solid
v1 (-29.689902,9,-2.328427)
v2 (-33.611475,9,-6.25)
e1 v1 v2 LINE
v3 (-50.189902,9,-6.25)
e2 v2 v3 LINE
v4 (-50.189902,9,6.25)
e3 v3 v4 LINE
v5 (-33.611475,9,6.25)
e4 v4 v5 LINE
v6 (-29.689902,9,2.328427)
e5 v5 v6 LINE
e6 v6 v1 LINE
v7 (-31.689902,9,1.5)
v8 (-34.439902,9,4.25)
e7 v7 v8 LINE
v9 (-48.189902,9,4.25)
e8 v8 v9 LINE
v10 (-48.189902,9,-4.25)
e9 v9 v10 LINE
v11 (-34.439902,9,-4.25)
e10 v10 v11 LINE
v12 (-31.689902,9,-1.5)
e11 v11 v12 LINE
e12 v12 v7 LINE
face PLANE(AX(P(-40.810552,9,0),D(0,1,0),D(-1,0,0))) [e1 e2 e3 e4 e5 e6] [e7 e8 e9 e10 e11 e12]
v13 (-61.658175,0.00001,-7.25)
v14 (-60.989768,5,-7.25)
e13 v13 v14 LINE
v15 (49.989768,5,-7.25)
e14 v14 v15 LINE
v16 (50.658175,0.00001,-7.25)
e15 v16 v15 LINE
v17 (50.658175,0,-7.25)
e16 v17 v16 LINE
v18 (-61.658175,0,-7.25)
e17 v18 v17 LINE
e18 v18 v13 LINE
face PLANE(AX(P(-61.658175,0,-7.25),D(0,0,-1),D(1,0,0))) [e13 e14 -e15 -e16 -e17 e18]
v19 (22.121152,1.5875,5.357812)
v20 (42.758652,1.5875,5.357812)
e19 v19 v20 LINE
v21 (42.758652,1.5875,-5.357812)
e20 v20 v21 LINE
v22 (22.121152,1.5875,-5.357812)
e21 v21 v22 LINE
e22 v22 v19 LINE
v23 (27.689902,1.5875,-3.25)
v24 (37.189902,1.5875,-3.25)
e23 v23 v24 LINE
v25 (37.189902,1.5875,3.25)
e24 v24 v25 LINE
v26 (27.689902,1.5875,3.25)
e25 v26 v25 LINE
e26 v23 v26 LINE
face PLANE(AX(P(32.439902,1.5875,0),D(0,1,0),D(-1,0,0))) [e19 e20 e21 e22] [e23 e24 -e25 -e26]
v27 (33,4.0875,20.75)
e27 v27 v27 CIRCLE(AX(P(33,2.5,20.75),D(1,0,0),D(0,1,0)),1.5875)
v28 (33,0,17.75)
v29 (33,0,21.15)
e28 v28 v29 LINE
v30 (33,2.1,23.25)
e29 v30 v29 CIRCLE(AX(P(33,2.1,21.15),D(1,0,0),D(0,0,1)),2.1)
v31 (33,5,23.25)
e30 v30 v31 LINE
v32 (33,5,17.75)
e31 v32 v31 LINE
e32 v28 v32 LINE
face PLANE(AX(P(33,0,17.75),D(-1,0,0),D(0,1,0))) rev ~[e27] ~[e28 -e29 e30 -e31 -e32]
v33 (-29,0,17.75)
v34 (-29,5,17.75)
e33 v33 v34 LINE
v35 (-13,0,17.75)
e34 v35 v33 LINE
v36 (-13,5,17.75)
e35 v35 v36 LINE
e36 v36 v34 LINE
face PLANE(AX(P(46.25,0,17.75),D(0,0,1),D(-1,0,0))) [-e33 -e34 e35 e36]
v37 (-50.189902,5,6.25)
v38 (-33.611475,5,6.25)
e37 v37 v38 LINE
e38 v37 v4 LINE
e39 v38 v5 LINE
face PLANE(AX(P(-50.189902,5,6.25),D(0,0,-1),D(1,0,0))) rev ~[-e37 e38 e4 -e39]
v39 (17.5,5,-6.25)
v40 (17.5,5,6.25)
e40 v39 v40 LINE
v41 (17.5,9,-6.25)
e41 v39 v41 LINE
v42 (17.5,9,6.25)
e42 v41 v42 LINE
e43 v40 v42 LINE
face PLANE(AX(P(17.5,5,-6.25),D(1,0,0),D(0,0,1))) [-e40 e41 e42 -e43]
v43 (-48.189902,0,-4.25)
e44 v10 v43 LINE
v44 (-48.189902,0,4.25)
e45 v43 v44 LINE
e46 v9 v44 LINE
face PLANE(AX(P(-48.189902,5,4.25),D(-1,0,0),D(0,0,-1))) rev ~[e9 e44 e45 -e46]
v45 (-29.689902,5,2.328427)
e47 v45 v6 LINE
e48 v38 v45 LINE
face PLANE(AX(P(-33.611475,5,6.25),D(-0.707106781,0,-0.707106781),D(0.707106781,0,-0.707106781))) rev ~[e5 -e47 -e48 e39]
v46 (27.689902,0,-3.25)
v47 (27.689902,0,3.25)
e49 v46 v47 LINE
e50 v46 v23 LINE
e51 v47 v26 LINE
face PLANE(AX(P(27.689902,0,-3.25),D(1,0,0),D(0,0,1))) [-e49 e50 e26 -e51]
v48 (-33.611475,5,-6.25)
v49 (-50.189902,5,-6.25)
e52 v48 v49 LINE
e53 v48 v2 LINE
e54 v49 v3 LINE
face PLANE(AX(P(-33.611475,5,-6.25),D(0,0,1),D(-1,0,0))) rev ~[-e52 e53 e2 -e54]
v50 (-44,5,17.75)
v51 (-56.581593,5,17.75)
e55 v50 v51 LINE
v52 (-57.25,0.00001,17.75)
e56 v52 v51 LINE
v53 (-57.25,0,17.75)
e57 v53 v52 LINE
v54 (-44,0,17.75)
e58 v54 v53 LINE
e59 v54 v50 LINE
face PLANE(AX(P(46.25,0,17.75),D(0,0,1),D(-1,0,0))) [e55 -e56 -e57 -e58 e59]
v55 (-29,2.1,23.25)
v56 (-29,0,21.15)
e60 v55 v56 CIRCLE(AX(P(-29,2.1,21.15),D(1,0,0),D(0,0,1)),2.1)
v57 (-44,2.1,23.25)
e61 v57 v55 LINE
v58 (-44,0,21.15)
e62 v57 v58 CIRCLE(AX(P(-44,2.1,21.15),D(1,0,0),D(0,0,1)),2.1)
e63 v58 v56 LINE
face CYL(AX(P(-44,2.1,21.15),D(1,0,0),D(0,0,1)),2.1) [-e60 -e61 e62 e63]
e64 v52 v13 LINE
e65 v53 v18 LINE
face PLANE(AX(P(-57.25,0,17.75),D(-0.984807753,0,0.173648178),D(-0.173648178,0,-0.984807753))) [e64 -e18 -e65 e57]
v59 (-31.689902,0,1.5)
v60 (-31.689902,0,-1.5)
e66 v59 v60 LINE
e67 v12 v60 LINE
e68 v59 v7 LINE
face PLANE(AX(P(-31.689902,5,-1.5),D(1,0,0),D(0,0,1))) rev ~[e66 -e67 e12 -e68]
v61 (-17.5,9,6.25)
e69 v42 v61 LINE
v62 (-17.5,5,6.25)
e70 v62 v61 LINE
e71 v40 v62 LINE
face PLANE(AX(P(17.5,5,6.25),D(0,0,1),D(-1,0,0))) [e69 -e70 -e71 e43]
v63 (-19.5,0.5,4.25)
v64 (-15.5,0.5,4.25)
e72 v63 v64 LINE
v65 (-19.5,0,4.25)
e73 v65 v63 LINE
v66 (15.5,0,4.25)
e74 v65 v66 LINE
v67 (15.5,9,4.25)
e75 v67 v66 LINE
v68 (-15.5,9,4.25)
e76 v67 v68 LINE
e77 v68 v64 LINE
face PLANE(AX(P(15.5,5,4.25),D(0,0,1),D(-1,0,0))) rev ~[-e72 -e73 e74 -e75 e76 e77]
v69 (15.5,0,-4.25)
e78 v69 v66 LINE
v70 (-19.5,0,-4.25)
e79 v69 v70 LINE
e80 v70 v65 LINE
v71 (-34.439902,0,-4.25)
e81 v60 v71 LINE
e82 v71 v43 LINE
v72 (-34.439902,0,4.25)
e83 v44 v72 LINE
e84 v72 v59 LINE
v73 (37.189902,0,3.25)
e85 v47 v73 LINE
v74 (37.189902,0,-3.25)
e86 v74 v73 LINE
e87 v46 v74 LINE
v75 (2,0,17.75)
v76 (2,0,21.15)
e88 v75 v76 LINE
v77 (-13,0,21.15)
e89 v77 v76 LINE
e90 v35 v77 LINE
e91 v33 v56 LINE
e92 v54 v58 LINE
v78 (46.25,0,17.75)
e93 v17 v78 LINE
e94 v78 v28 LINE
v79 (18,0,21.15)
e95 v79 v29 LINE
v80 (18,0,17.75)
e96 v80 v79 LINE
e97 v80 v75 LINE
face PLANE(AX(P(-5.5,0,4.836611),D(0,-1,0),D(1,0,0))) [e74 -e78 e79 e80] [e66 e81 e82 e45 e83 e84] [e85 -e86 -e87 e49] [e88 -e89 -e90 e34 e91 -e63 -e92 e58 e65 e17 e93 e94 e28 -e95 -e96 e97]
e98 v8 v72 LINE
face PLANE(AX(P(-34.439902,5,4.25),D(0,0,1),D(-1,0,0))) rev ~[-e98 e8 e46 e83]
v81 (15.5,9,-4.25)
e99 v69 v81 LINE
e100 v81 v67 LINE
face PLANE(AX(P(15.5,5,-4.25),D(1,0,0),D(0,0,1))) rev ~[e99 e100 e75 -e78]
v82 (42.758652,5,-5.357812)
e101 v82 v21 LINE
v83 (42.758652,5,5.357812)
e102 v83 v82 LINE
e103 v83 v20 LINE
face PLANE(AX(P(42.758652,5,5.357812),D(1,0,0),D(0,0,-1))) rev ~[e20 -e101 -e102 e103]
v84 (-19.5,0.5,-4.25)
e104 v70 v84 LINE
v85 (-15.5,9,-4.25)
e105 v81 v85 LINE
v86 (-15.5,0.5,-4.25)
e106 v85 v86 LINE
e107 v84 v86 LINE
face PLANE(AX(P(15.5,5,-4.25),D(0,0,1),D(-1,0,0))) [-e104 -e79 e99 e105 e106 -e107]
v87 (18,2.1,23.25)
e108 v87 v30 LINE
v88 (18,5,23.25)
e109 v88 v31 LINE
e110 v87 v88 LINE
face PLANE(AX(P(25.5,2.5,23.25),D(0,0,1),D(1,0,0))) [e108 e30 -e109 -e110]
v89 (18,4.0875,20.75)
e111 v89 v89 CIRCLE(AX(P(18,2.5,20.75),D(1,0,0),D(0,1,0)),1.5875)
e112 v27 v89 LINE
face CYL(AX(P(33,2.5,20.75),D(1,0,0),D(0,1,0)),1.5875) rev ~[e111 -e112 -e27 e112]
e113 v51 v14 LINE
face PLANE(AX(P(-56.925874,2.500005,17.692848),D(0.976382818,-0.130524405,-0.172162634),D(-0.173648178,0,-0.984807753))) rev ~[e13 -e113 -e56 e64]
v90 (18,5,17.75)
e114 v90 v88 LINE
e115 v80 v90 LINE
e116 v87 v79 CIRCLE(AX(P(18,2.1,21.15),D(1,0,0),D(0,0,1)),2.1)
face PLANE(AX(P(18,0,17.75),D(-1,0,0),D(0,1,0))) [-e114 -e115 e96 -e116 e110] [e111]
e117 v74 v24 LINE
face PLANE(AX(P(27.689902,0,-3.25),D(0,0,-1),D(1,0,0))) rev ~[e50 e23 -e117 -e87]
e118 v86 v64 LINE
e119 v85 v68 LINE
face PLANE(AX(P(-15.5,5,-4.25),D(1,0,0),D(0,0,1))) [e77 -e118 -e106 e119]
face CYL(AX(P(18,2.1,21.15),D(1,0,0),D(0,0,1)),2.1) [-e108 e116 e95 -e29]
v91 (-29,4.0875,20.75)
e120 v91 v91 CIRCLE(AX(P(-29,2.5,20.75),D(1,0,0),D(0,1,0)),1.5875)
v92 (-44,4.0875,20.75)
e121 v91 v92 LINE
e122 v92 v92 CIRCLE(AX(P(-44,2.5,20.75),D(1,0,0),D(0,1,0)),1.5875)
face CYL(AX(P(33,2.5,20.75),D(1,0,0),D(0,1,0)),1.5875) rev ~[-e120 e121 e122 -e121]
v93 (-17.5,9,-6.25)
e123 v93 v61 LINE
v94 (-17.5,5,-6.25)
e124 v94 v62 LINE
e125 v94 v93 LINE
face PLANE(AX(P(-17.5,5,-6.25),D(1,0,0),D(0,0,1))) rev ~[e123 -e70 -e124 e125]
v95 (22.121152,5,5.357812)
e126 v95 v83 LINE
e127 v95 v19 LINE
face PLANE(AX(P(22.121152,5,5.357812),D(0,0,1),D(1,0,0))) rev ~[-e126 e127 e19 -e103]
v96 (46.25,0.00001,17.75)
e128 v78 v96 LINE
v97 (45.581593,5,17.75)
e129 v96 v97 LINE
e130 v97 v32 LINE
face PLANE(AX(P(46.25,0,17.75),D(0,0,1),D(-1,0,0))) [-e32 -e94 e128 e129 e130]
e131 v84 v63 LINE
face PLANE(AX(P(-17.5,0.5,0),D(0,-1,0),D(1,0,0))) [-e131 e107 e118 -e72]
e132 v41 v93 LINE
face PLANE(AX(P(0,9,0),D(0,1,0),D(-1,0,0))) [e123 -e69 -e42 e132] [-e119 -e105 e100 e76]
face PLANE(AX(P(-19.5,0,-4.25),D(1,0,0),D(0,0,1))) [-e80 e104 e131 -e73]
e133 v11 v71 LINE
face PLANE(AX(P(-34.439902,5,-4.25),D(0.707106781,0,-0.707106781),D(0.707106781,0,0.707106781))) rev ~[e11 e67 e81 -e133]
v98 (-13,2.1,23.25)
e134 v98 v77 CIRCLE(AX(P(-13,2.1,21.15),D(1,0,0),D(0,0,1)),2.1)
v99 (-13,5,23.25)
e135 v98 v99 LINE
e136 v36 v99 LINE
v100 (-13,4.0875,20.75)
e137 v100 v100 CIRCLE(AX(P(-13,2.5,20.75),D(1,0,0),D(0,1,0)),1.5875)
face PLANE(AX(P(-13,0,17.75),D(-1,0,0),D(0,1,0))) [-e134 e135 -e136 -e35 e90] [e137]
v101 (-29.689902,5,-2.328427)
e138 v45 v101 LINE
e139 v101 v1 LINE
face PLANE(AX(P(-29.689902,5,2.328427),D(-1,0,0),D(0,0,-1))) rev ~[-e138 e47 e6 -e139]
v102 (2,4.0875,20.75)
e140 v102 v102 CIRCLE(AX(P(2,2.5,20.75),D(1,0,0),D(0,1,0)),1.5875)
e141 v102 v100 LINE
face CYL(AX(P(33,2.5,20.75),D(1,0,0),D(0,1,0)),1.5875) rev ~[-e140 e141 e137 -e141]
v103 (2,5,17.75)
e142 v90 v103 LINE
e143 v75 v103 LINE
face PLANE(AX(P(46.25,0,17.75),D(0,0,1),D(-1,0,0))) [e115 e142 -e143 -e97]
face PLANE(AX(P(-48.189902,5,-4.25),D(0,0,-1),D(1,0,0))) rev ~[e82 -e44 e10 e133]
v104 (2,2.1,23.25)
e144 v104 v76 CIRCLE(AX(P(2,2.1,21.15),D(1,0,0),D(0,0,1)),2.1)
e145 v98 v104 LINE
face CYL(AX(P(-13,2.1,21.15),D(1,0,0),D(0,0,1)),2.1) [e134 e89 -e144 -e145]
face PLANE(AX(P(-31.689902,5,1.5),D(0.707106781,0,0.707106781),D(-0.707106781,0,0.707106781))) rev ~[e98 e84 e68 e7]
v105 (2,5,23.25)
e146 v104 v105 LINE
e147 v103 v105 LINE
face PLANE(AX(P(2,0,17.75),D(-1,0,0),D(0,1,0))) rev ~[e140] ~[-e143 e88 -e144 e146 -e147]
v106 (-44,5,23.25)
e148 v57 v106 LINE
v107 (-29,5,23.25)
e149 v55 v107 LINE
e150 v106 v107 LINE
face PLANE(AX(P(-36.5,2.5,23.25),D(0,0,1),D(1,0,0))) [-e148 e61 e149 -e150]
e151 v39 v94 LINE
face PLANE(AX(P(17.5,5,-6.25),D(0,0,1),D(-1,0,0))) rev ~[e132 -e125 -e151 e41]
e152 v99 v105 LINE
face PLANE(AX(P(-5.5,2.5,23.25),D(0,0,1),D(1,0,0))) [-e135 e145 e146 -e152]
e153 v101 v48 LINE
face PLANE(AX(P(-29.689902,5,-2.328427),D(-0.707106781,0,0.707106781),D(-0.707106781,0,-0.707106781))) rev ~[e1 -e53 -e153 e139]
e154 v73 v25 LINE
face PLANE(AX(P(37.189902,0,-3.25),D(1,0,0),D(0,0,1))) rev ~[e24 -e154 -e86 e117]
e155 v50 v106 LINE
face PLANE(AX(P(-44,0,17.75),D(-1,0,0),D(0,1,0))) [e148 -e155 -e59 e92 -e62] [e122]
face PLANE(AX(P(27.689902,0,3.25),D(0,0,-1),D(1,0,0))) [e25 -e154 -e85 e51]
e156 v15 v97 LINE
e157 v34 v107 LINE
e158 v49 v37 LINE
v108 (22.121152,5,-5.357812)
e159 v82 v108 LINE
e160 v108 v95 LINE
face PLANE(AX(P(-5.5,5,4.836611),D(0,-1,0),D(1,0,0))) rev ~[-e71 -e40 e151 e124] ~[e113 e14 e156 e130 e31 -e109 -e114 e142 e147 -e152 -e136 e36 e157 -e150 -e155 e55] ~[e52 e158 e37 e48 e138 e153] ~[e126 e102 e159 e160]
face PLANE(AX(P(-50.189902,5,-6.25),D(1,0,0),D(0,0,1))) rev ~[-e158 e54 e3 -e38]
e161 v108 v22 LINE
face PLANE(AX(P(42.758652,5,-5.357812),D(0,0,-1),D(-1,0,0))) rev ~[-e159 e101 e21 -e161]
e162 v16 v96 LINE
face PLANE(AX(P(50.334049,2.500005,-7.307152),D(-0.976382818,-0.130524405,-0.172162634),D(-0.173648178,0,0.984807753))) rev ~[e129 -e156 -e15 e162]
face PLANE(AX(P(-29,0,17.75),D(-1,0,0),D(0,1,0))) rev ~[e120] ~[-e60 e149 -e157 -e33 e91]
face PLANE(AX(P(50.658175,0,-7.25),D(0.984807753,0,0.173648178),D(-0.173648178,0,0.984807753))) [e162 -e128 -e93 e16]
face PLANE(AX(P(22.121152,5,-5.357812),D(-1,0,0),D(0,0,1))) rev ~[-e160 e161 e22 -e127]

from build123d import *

# Parameters (mm, degrees)
F0_W       = 31
F0_H       = 8.5
F0_W_2     = 9.5
F0_H_2     = 6.5
F1_DEPTH   = 5
F2_W       = 4
F2_H       = 8.5
F3_DEPTH   = 0.5
F5_DEPTH   = 3.4125
F7_SIZE2   = 0.658252
F7_SIZE    = 4.99999
F7_2_SIZE2 = 0.658252
F7_2_SIZE  = 4.99999
F8_W       = 35
F8_H       = 12.5
F8_W_2     = 31
F8_H_2     = 8.5
F9_DEPTH   = 4
F11_DEPTH  = 4
F12_W      = 15
F12_H      = 5
F13_DEPTH  = 5.5
F14_R      = 1.5875
F15_DEPTH  = 94.6591745177
F16_R      = 2.1


# Not quite as in the source:
# - a fillet or chamfer is up to 0.001 mm smaller than in the source, because OpenCascade refuses the exact size
# - a length typed as a fraction of an inch, garbled in the dataset ("3 / 203.2 mm" for 3/8 in), is restored


with BuildPart() as f1:
    # F0 (on Front) → F1 (new body)
    with BuildSketch(Plane.XZ):
        Polygon((46.25, 17.75), (-57.25, 17.75), (-61.6581745177, -7.25), (50.6581745177, -7.25), align=None)
        Polygon((-48.1899019538, 4.25), (-34.4399019538, 4.25), (-31.6899019538, 1.5), (-31.6899019538, -1.5), (-34.4399019538, -4.25), (-48.1899019538, -4.25), align=None, mode=Mode.SUBTRACT)
        Rectangle(F0_W, F0_H, mode=Mode.SUBTRACT)
        with Locations((32.4399019538, 0)):
            Rectangle(F0_W_2, F0_H_2, mode=Mode.SUBTRACT)
    extrude(amount=-F1_DEPTH)

    # F2 (on face) → F3 (cut)
    with BuildSketch(Plane.XZ):
        with Locations((-17.5, 0)):
            Rectangle(F2_W, F2_H)
    extrude(amount=-F3_DEPTH, mode=Mode.SUBTRACT)

    # F4 (on face) → F5 (cut)
    with BuildSketch(Plane(origin=(0, 5, 0), x_dir=(-1, 0, 0), z_dir=(0, 1, 0))):
        Polygon((-22.1211519538, -5.3578125), (-22.1211519538, 5.3578125), (-42.7586519538, 5.3578125), (-42.7586519538, -5.3578125), align=None)
    extrude(amount=-F5_DEPTH, mode=Mode.SUBTRACT)

    # F7 (size 5 and 0.6582624879 in the source; OpenCascade refuses exactly that, so slightly less here)
    f7_edges = [f1.edges().sort_by_distance(p)[0] for p in [
        (-59.454087, 5, 5.25),
    ]]
    f7_side = f1.faces().sort_by_distance((-59.454087, 2.5, 5.25))[0]
    chamfer(f7_edges, length=F7_SIZE, length2=F7_SIZE2, reference=f7_side)

    # F7#2 (size 5 and 0.6582624879 in the source; OpenCascade refuses exactly that, so slightly less here)
    f7_2_edges = [f1.edges().sort_by_distance(p)[0] for p in [
        (48.454087, 5, 5.25),
    ]]
    f7_2_side = f1.faces().sort_by_distance((48.454087, 2.5, 5.25))[0]
    chamfer(f7_2_edges, length=F7_2_SIZE, length2=F7_2_SIZE2, reference=f7_2_side)

    # F8 (on face) → F9 (join)
    with BuildSketch(Plane(origin=(0, 5, 0), x_dir=(-1, 0, 0), z_dir=(0, 1, 0))):
        Rectangle(F8_W, F8_H)
        Rectangle(F8_W_2, F8_H_2, mode=Mode.SUBTRACT)
    extrude(amount=F9_DEPTH)

    # F10 (on face) → F11 (join)
    with BuildSketch(Plane(origin=(0, 5, 0), x_dir=(-1, 0, 0), z_dir=(0, 1, 0))):
        Polygon((50.1899019538, 6.25), (33.611474829, 6.25), (29.6899019538, 2.3284271247), (29.6899019538, -2.3284271247), (33.611474829, -6.25), (50.1899019538, -6.25), align=None)
        Polygon((31.6899019538, 1.5), (34.4399019538, 4.25), (48.1899019538, 4.25), (48.1899019538, -4.25), (34.4399019538, -4.25), (31.6899019538, -1.5), align=None, mode=Mode.SUBTRACT)
    extrude(amount=F11_DEPTH)

    # F12 (on face) → F13 (join)
    with BuildSketch(Plane.XY.offset(17.75)):
        with Locations((-36.5, 2.5)):
            Rectangle(F12_W, F12_H)
        with Locations((25.5, 2.5)):
            Rectangle(F12_W, F12_H)
        with Locations((-5.5, 2.5)):
            Rectangle(F12_W, F12_H)
    extrude(amount=F13_DEPTH)

    # F14 (on face) → F15 (cut, through all)
    with BuildSketch(Plane.YZ.offset(33)):
        with Locations((2.5, 20.75)):
            Circle(F14_R)
    extrude(amount=-F15_DEPTH, mode=Mode.SUBTRACT)

    # F16
    f16_edges = [f1.edges().sort_by_distance(p)[0] for p in [
        (-36.5, 0, 23.25),
        (-5.5, 0, 23.25),
        (25.5, 0, 23.25),
    ]]
    fillet(f16_edges, radius=F16_R)


solid = f1.part
